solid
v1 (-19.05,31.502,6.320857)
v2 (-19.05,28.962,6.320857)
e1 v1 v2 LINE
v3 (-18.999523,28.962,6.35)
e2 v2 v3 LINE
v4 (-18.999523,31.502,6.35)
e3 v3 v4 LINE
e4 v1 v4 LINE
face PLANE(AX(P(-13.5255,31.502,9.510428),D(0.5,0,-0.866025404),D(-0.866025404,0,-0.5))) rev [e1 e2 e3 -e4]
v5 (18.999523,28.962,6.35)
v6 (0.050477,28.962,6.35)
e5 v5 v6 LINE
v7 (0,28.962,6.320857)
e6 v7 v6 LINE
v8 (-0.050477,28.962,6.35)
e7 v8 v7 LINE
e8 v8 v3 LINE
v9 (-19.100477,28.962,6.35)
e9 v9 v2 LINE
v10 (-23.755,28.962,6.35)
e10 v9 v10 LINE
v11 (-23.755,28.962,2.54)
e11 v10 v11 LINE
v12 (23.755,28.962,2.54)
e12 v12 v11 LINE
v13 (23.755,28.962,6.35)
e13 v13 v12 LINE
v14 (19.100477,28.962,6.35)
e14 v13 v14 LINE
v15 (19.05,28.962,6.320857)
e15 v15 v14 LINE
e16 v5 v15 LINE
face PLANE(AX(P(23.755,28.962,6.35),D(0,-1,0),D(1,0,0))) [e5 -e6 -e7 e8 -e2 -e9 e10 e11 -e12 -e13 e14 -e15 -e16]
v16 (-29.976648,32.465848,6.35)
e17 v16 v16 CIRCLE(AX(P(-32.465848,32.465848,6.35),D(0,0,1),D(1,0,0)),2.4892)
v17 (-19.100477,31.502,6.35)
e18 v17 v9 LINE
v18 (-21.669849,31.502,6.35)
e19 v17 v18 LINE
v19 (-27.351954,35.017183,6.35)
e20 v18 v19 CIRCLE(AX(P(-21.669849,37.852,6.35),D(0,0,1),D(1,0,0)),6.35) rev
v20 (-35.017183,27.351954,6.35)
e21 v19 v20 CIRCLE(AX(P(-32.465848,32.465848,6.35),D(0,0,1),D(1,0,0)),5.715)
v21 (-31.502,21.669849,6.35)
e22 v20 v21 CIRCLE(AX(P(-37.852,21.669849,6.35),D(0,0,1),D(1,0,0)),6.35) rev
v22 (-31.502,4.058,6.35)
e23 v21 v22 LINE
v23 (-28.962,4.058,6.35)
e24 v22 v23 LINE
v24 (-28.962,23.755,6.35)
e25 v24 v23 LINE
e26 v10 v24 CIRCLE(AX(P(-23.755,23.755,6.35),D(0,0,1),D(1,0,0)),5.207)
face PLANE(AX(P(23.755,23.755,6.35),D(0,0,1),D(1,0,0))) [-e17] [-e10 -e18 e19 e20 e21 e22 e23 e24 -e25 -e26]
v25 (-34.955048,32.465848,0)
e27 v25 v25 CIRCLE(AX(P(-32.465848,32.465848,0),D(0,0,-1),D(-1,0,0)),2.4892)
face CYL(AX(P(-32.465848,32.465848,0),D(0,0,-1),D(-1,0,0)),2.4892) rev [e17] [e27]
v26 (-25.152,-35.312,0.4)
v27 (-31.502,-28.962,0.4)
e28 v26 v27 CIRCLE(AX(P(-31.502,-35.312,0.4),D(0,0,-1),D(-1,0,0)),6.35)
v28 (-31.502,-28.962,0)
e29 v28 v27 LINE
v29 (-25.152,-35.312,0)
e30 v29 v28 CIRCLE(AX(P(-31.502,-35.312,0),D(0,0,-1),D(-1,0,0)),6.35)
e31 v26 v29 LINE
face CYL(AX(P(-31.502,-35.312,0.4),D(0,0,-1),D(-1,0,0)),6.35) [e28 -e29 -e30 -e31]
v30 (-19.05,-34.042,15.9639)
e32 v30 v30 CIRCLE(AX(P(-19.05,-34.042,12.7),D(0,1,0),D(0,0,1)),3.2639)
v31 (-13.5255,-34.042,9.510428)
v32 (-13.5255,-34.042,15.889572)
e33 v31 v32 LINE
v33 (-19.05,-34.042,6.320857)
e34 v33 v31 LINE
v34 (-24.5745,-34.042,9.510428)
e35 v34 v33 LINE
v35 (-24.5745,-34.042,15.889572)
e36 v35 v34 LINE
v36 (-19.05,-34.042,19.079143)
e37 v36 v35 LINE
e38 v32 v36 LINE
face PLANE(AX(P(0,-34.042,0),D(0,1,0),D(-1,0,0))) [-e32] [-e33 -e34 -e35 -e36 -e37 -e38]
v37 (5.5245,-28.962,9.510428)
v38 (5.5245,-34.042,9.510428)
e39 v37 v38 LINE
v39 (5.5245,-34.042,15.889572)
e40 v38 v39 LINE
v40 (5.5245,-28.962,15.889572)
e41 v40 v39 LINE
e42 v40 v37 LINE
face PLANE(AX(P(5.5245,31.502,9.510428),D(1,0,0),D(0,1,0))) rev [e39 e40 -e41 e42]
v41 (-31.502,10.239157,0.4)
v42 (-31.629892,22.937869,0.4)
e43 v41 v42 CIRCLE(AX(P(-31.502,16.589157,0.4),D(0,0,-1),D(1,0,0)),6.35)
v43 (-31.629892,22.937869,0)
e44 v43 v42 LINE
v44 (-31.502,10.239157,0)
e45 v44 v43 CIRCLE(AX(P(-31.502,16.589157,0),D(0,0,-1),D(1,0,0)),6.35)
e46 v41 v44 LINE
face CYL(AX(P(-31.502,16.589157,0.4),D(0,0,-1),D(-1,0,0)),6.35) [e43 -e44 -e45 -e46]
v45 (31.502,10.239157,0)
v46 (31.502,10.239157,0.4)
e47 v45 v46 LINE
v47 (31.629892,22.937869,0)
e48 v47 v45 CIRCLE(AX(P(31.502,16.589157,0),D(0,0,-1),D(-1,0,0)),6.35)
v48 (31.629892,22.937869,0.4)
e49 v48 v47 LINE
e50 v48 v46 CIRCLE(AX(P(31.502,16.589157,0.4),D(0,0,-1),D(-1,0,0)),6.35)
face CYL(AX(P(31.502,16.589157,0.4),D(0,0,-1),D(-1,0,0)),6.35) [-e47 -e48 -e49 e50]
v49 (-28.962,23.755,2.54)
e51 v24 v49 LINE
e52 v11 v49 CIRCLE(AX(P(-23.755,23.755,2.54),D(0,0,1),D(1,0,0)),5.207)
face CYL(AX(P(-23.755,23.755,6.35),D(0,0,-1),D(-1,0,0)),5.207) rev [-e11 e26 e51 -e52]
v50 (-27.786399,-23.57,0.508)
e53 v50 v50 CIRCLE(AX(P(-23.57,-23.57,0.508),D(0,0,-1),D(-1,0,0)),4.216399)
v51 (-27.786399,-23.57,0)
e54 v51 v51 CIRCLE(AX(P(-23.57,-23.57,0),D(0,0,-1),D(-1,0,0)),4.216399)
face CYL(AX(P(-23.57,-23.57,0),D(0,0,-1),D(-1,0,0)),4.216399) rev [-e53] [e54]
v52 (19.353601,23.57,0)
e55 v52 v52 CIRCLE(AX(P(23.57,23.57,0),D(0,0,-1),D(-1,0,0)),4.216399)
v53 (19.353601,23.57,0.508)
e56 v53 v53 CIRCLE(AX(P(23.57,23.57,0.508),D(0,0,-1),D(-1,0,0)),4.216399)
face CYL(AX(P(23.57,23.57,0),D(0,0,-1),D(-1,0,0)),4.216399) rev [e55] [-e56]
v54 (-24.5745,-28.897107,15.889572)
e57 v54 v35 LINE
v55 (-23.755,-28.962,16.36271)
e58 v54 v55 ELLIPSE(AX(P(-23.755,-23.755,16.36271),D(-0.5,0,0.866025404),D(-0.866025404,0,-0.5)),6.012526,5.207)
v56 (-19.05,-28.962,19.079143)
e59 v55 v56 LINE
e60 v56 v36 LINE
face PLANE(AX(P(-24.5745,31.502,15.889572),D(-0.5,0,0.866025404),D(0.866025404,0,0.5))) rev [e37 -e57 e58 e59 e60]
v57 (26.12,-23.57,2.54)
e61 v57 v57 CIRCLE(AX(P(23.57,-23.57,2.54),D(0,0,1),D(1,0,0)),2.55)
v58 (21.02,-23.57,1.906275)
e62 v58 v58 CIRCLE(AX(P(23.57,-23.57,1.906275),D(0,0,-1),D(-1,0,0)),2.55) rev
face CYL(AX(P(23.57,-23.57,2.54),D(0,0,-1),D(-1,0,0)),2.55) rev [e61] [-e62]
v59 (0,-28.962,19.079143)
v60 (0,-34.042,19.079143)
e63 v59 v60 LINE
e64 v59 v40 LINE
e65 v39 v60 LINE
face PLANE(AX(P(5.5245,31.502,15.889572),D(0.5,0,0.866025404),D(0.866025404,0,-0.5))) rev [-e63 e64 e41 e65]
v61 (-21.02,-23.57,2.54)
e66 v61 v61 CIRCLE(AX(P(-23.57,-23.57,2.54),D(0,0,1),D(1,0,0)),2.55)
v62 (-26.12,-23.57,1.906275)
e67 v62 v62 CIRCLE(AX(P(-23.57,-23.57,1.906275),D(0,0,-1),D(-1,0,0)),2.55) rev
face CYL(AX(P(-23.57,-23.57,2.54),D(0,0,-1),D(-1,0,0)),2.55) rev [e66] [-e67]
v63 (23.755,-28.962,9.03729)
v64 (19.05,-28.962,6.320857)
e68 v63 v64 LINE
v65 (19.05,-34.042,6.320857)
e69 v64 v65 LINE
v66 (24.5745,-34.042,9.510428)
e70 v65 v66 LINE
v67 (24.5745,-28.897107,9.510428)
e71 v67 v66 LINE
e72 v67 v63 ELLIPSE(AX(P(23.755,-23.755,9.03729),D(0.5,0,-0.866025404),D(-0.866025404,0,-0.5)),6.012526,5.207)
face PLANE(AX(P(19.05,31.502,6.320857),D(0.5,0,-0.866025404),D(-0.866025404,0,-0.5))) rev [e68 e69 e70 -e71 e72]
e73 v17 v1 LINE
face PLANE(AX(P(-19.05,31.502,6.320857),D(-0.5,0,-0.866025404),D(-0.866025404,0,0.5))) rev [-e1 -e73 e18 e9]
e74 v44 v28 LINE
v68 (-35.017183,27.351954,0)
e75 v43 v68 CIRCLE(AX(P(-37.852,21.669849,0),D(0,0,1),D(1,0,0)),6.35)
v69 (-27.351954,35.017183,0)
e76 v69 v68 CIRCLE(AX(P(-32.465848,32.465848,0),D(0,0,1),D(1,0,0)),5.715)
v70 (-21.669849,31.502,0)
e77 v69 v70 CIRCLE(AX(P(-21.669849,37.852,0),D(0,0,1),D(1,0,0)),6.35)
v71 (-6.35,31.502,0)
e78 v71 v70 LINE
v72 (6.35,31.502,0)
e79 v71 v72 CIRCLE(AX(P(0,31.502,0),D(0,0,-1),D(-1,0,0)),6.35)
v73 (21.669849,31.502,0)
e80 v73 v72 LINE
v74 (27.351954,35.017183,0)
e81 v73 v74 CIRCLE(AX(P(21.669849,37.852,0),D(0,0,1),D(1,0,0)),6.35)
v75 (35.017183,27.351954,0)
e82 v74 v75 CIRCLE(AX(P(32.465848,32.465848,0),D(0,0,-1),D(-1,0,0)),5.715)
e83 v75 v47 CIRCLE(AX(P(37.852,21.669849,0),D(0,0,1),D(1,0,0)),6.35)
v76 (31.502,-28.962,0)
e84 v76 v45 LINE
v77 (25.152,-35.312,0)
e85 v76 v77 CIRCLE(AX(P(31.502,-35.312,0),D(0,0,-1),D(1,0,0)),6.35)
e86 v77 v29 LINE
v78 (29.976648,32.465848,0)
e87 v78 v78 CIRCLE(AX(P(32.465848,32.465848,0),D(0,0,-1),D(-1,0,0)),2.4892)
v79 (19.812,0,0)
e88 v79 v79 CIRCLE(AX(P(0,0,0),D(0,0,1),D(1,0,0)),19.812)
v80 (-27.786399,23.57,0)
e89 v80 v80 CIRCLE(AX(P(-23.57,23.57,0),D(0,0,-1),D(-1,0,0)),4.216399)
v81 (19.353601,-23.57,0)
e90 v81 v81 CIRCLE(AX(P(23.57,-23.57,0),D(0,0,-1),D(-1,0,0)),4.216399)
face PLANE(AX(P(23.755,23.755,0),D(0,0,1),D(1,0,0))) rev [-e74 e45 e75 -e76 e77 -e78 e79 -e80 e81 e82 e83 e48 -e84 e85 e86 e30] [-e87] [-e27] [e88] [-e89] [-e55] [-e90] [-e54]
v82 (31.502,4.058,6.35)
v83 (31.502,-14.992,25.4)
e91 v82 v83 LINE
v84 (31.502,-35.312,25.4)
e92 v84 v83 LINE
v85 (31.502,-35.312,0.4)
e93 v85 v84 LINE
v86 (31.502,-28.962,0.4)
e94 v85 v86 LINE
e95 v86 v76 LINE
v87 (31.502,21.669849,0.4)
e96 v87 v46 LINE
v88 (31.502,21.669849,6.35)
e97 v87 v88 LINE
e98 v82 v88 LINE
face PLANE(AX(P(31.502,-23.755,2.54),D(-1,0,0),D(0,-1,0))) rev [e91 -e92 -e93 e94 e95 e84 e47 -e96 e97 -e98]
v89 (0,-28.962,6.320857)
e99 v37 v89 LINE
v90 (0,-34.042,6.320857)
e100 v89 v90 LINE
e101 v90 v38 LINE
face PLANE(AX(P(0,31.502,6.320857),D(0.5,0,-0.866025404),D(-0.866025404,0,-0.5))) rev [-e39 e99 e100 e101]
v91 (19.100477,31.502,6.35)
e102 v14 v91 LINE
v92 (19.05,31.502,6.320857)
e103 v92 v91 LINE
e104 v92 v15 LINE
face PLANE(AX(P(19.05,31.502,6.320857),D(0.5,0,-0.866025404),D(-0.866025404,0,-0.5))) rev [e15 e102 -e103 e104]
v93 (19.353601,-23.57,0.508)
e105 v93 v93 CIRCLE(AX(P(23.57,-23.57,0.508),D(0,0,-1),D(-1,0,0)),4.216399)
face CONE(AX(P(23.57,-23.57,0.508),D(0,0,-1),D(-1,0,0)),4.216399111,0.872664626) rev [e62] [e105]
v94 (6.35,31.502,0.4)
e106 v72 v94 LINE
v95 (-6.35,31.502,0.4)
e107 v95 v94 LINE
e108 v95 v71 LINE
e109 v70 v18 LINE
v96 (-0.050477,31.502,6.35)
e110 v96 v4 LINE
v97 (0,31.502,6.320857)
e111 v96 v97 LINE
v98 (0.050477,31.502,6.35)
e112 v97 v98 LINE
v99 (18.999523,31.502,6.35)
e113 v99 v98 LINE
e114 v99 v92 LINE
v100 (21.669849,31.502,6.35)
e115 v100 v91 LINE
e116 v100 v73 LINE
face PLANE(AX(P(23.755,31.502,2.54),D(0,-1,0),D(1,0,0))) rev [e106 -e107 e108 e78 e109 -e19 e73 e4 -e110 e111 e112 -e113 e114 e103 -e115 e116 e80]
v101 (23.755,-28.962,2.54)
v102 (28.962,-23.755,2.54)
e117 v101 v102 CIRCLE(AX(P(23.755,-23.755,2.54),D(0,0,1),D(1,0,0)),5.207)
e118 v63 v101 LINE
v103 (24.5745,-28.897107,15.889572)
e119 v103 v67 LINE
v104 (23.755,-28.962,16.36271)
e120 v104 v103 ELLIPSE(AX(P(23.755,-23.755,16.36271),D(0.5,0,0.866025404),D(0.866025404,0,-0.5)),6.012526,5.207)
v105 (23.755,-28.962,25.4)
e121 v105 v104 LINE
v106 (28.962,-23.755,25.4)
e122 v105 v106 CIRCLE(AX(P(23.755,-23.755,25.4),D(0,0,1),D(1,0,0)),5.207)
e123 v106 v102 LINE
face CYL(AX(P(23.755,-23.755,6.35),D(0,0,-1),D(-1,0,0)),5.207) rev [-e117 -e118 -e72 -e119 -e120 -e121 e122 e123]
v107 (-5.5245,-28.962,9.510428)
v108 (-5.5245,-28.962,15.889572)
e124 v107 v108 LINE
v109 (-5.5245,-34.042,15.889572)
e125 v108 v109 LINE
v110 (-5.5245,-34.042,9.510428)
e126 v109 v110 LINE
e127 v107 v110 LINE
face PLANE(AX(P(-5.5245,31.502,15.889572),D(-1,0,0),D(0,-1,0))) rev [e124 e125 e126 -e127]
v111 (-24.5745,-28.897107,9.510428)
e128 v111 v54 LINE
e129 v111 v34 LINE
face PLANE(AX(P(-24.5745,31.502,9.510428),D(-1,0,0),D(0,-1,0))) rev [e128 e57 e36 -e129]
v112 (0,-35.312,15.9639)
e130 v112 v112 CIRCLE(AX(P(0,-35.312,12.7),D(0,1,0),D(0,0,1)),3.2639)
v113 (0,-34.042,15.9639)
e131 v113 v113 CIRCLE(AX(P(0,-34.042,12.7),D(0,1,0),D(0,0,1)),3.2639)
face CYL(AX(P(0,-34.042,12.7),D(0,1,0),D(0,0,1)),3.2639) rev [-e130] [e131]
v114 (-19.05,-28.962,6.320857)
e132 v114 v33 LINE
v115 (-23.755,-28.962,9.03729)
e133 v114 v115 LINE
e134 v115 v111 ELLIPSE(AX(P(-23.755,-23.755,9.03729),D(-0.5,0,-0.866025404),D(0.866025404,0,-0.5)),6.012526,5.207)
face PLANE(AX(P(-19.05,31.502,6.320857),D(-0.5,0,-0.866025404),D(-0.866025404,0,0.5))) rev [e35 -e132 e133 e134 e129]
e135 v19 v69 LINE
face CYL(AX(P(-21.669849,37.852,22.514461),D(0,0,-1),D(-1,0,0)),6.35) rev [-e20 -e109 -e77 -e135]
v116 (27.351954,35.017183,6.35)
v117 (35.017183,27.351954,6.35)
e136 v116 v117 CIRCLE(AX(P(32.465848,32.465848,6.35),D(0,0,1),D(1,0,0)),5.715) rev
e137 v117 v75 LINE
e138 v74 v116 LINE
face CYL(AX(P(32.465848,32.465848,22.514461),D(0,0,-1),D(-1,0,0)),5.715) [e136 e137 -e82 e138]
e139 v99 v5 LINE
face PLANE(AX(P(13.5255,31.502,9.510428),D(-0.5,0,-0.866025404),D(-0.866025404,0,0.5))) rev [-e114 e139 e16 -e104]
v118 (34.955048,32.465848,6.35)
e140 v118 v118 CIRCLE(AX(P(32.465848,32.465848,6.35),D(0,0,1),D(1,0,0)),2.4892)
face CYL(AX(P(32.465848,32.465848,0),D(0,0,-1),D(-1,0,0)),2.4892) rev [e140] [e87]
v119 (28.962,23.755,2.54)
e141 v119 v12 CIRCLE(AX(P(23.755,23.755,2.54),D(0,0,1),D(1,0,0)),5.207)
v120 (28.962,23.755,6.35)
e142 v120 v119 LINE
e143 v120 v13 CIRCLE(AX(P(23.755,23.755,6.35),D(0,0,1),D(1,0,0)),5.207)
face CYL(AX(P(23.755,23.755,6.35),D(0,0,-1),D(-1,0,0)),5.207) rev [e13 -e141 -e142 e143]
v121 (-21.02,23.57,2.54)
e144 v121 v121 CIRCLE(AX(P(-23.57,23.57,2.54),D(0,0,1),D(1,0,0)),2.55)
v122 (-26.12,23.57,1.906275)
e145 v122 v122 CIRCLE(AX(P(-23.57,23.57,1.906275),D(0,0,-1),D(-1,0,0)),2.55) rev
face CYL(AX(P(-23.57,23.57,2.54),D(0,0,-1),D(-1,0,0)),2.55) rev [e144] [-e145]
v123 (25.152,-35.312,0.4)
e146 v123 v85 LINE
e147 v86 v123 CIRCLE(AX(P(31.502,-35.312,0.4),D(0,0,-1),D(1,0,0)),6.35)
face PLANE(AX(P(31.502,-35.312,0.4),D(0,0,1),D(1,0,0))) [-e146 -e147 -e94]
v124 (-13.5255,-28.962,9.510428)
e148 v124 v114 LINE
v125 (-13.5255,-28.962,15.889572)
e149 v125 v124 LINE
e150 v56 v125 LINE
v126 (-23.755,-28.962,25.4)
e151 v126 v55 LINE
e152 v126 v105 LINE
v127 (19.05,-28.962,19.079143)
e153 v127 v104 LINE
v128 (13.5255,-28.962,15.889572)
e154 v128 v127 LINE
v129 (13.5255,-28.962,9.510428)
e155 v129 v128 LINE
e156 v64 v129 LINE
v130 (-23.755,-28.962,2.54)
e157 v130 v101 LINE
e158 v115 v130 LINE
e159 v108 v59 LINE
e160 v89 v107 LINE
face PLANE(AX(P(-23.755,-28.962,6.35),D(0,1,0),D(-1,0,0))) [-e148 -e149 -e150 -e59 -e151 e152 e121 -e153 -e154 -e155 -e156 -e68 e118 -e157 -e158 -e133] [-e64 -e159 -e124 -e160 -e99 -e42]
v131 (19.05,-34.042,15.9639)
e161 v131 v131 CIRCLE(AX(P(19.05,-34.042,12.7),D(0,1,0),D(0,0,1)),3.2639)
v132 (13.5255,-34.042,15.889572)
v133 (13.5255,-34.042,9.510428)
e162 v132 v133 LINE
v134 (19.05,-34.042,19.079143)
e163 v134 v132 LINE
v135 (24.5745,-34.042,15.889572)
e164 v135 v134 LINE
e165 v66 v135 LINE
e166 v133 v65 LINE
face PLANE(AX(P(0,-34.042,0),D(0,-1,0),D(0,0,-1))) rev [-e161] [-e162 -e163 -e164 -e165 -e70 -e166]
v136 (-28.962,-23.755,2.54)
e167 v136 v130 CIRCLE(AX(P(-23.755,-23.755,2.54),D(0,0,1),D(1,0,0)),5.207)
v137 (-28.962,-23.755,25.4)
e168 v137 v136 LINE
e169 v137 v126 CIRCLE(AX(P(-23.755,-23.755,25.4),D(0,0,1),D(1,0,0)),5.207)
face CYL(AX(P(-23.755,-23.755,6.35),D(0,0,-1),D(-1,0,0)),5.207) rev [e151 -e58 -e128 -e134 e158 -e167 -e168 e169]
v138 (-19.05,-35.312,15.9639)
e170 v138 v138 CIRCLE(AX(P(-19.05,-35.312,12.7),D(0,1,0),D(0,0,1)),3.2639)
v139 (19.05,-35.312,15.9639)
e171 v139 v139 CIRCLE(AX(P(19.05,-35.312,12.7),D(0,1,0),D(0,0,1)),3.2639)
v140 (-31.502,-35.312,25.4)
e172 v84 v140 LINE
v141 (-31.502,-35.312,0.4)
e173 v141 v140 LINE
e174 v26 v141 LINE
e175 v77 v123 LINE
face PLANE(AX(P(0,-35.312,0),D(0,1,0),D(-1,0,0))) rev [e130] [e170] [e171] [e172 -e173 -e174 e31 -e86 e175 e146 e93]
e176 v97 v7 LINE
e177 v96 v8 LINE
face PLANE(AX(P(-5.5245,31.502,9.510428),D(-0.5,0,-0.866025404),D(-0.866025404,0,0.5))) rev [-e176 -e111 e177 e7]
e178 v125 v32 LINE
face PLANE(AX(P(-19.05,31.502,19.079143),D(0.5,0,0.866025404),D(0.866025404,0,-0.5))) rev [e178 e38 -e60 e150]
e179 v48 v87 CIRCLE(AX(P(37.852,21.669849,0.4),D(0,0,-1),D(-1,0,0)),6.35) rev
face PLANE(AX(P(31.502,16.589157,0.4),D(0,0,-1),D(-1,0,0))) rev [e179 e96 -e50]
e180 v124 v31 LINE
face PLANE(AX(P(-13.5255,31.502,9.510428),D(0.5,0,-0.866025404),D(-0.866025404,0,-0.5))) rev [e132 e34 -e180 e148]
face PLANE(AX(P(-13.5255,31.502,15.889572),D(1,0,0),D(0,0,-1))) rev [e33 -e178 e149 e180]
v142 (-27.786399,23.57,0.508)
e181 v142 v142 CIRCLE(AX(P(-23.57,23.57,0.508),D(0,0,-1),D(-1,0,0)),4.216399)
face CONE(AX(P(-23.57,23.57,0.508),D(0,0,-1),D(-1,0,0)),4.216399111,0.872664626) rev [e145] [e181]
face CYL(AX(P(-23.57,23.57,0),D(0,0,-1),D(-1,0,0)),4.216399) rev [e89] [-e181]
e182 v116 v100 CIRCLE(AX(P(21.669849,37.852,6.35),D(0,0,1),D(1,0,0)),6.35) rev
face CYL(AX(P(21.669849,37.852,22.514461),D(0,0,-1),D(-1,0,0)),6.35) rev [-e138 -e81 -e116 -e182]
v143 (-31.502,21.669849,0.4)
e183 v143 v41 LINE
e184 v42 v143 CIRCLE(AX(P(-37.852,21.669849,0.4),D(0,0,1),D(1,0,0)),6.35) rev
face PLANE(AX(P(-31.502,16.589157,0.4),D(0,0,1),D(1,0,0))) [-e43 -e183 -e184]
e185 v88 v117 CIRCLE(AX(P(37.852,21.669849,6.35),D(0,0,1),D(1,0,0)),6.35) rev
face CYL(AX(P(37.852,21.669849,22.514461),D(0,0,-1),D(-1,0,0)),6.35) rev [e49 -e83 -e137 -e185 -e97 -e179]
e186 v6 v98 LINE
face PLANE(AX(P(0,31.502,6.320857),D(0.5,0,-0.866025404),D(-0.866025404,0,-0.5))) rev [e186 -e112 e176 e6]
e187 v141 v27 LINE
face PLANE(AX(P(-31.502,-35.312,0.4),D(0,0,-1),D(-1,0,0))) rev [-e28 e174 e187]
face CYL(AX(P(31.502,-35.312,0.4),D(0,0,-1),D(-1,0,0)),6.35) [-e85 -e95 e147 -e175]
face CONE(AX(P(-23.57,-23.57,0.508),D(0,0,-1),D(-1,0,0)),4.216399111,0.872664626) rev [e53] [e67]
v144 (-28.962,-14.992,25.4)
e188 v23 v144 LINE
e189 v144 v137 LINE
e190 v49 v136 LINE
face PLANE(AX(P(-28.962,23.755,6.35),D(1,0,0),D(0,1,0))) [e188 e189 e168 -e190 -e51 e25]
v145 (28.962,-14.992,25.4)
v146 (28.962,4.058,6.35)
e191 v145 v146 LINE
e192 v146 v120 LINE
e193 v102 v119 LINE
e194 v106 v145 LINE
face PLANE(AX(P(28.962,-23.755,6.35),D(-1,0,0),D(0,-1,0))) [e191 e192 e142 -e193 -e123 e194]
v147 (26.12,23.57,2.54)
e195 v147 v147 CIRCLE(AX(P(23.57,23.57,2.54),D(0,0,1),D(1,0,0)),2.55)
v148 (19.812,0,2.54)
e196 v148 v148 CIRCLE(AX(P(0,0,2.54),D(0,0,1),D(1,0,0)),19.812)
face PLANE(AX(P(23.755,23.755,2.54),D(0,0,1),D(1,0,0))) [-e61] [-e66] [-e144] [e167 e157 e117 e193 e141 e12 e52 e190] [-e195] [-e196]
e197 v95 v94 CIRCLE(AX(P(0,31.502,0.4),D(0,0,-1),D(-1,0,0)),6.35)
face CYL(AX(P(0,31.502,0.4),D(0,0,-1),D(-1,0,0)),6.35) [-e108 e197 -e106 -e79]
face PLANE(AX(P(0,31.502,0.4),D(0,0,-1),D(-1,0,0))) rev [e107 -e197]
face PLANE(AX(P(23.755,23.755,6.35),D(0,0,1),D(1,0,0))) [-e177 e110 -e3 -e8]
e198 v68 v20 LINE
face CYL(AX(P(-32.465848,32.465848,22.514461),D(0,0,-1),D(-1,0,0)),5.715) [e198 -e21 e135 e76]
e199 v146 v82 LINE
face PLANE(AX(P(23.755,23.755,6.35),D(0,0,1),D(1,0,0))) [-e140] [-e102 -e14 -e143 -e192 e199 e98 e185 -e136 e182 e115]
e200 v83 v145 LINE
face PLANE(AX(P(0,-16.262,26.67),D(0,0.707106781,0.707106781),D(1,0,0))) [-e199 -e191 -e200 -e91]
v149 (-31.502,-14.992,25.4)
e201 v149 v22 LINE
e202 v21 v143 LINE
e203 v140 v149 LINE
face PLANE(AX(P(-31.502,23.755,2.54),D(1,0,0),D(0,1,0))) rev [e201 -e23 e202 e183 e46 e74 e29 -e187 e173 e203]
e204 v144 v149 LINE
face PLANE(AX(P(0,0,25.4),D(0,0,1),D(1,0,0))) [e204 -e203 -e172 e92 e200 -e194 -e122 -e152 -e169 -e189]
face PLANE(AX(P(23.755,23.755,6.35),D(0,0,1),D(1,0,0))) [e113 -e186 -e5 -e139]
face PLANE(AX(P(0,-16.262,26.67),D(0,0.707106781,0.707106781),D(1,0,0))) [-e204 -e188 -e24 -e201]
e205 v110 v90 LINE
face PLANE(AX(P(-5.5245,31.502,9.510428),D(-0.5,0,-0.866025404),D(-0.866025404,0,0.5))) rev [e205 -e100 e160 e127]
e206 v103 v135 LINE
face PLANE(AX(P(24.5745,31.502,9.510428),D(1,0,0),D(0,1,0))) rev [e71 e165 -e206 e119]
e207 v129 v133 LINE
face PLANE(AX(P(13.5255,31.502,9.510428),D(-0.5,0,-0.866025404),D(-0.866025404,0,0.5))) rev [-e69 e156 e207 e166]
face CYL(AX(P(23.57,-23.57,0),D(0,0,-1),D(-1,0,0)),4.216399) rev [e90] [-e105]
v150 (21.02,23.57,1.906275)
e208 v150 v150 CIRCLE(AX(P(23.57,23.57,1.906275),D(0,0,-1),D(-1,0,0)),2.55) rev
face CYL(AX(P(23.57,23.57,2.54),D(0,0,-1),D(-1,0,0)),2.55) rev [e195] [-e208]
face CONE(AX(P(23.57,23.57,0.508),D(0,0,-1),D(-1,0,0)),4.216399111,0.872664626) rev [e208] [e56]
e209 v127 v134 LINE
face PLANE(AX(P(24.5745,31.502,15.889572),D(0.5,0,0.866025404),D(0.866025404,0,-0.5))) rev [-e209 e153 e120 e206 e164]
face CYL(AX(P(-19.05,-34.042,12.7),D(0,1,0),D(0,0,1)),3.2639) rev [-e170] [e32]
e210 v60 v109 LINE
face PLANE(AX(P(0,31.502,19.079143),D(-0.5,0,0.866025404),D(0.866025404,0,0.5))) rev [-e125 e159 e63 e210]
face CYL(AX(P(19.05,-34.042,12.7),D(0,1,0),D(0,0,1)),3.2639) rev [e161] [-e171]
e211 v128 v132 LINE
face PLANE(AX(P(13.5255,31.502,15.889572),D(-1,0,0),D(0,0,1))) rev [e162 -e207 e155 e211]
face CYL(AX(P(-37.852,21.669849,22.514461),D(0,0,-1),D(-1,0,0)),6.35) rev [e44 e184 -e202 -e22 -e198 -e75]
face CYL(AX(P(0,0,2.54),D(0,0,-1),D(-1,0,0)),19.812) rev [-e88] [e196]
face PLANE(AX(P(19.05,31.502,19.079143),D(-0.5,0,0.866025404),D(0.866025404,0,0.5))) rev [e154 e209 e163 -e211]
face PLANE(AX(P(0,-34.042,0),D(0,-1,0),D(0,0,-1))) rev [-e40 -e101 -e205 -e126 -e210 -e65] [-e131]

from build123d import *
from build123d.topology import SkipClean

# Parameters (mm, degrees)
SKETCH3_R                                     = 19.812
SKETCH3_R_2                                   = 2.55
BOSS_EXTRUDE1_DEPTH                           = 2.54
BOSS_EXTRUDE6_DEPTH                           = 3.81
BOSS_EXTRUDE10_DEPTH                          = 22.86
BOSS_EXTRUDE10_DEPTH_BACK                     = 2.54
CHAMFER1_SIZE                                 = 20.32
CUT_EXTRUDE2_DEPTH                            = 5.08
CUT_EXTRUDE2_DEPTH_BACK                       = 73.755970889
F_1_4_CLEARANCE_HOLE1_D                       = 6.5278
SKETCH22_R                                    = 2.413
BOSS_EXTRUDE18_DEPTH                          = 6.35
FILLET1_R                                     = 6.35
CSK_FOR_FLAT_HEAD_MACHINE_SCREW_100_1_A_COUNT = 2
CSK_FOR_FLAT_HEAD_MACHINE_SCREW_100_1_A_PITCH = 47.14
CSK_FOR_FLAT_HEAD_MACHINE_SCREW_100_2_COUNT   = 2
CSK_FOR_FLAT_HEAD_MACHINE_SCREW_100_2_PITCH   = 66.66602733
CSK_FOR_FLAT_HEAD_MACHINE_SCREW_100_3_COUNT   = 2
CSK_FOR_FLAT_HEAD_MACHINE_SCREW_100_3_PITCH   = 47.14
F_10_CLEARANCE_HOLE1_D                        = 4.9784
SKETCH6_R                                     = 6.35
TABS_DEPTH                                    = 0.4


with BuildPart() as part:
    # Sketch3 → Boss-Extrude1 (new body)
    with BuildSketch(Plane.XY):
        with BuildLine():
            Line((23.755, 31.502), (-23.755, 31.502))
            ThreePointArc((-23.755, 31.502), (-29.232956234, 29.232956234), (-31.502, 23.755))
            Line((-31.502, 23.755), (-31.502, -23.755))
            ThreePointArc((-31.502, -23.755), (-29.232956234, -29.232956234), (-23.755, -31.502))
            Line((-23.755, -31.502), (23.755, -31.502))
            ThreePointArc((23.755, -31.502), (29.232956234, -29.232956234), (31.502, -23.755))
            Line((31.502, -23.755), (31.502, 23.755))
            ThreePointArc((31.502, 23.755), (29.232956234, 29.232956234), (23.755, 31.502))
        make_face()
        Circle(SKETCH3_R, mode=Mode.SUBTRACT)
        with Locations((23.57, 23.57)):
            Circle(SKETCH3_R_2, mode=Mode.SUBTRACT)
        with Locations((-23.57, 23.57)):
            Circle(SKETCH3_R_2, mode=Mode.SUBTRACT)
        with Locations((-23.57, -23.57)):
            Circle(SKETCH3_R_2, mode=Mode.SUBTRACT)
        with Locations((23.57, -23.57)):
            Circle(SKETCH3_R_2, mode=Mode.SUBTRACT)
    extrude(amount=BOSS_EXTRUDE1_DEPTH)

    # Sketch16 → Boss-Extrude6 (add)
    with BuildSketch(Plane.XY.offset(2.54)):
        with BuildLine():
            Line((23.755, 31.502), (-23.755, 31.502))
            ThreePointArc((-23.755, 31.502), (-29.232956234, 29.232956234), (-31.502, 23.755))
            Line((-31.502, 23.755), (-31.502, -23.755))
            ThreePointArc((-31.502, -23.755), (-29.232956234, -29.232956234), (-23.755, -31.502))
            Line((-23.755, -31.502), (23.755, -31.502))
            ThreePointArc((23.755, -31.502), (29.232956234, -29.232956234), (31.502, -23.755))
            Line((31.502, -23.755), (31.502, 23.755))
            ThreePointArc((31.502, 23.755), (29.232956234, 29.232956234), (23.755, 31.502))
        make_face()
        with BuildLine():
            Line((23.755, 28.962), (-23.755, 28.962))
            ThreePointArc((-23.755, 28.962), (-27.43690501, 27.43690501), (-28.962, 23.755))
            Line((-28.962, 23.755), (-28.962, -23.755))
            ThreePointArc((-28.962, -23.755), (-27.43690501, -27.43690501), (-23.755, -28.962))
            Line((-23.755, -28.962), (23.755, -28.962))
            ThreePointArc((23.755, -28.962), (27.43690501, -27.43690501), (28.962, -23.755))
            Line((28.962, -23.755), (28.962, 23.755))
            ThreePointArc((28.962, 23.755), (27.43690501, 27.43690501), (23.755, 28.962))
        make_face(mode=Mode.SUBTRACT)
    extrude(amount=BOSS_EXTRUDE6_DEPTH)

    # Sketch17 → Boss-Extrude10 (add, two sides: drawn at the far end of the back side and taken through both)
    with SkipClean():  # the faces are left unmerged after this step: merging them gives an invalid solid
        with BuildSketch(Plane.XY.offset(2.54).offset(-BOSS_EXTRUDE10_DEPTH_BACK)):
            with BuildLine():
                Line((-31.502, -35.312), (31.502, -35.312))
                Line((31.502, -35.312), (31.502, -16.262))
                Line((31.502, -16.262), (28.962, -16.262))
                Line((28.962, -16.262), (28.962, -23.755))
                ThreePointArc((28.962, -23.755), (27.43690501, -27.43690501), (23.755, -28.962))
                Line((23.755, -28.962), (-23.755, -28.962))
                ThreePointArc((-23.755, -28.962), (-27.43690501, -27.43690501), (-28.962, -23.755))
                Line((-28.962, -23.755), (-28.962, -16.262))
                Line((-28.962, -16.262), (-31.502, -16.262))
                Line((-31.502, -16.262), (-31.502, -35.312))
            make_face()
        extrude(amount=BOSS_EXTRUDE10_DEPTH + BOSS_EXTRUDE10_DEPTH_BACK)
    add(part.part.scale(1), mode=Mode.REPLACE)  # the faces are merged on a copy

    # Chamfer1
    # the kernel refuses this chamfer: 20.32 mm, written as the material it adds along each edge
    with BuildSketch(Plane(origin=(28.962, -16.262, 6.35), x_dir=(0, -0.02749587661058643, 0.9996219169112968), z_dir=(1, 0, 0))) as chamfer1_piece_1_section:
        Polygon((CHAMFER1_SIZE * 0.999621916911, -CHAMFER1_SIZE * 0.0274958766106), (-CHAMFER1_SIZE * 0.0274958766106, -CHAMFER1_SIZE * 0.999621916911), (0, 0), align=None)
    chamfer1_piece_1 = extrude(amount=2.54, mode=Mode.PRIVATE)
    chamfer1_piece_1 = split(chamfer1_piece_1, bisect_by=Plane(origin=(30.232, -9.48984053, 25.4), z_dir=(0, 0, -1)), keep=Keep.TOP, mode=Mode.PRIVATE)
    add(chamfer1_piece_1)
    with BuildSketch(Plane(origin=(-31.502, -16.262, 6.35), x_dir=(0, -0.02749587661058643, 0.9996219169112968), z_dir=(1, 0, 0))) as chamfer1_piece_2_section:
        Polygon((CHAMFER1_SIZE * 0.999621916911, -CHAMFER1_SIZE * 0.0274958766106), (-CHAMFER1_SIZE * 0.0274958766106, -CHAMFER1_SIZE * 0.999621916911), (0, 0), align=None)
    chamfer1_piece_2 = extrude(amount=2.54, mode=Mode.PRIVATE)
    chamfer1_piece_2 = split(chamfer1_piece_2, bisect_by=Plane(origin=(-30.232, -9.48984053, 25.4), z_dir=(0, 0, -1)), keep=Keep.TOP, mode=Mode.PRIVATE)
    add(chamfer1_piece_2)

    # Sketch18 → Cut-Extrude2 (cut, two sides: drawn at the far end of the back side and taken through both)
    with BuildSketch(Plane.XZ.offset(28.962).offset(-CUT_EXTRUDE2_DEPTH_BACK)):
        Polygon((0, 19.079143124), (-5.5245, 15.889571562), (-5.5245, 9.510428438), (0, 6.320856876), (5.5245, 9.510428438), (5.5245, 15.889571562), align=None)
        Polygon((-24.5745, 15.889571562), (-19.05, 19.079143124), (-13.5255, 15.889571562), (-13.5255, 9.510428438), (-19.05, 6.320856876), (-24.5745, 9.510428438), align=None)
        Polygon((19.05, 19.079143124), (13.5255, 15.889571562), (13.5255, 9.510428438), (19.05, 6.320856876), (24.5745, 9.510428438), (24.5745, 15.889571562), align=None)
    extrude(amount=CUT_EXTRUDE2_DEPTH + CUT_EXTRUDE2_DEPTH_BACK, mode=Mode.SUBTRACT)

    # 1/4 Clearance Hole1 (through all)
    with Locations(Plane(origin=(0, -34.042, 0), x_dir=(1, 0, 0), z_dir=(0, 1, 0))):
        with Locations((-19.05, -12.7), (0, -12.7), (19.05, -12.7)):
            Hole(F_1_4_CLEARANCE_HOLE1_D / 2)

    # Sketch22 → Boss-Extrude18 (add)
    with BuildSketch(Plane(origin=(0, 0, 0), x_dir=(-1, 0, 0), z_dir=(0, 0, -1))):
        with BuildLine():
            ThreePointArc((-27.002557269, 30.78844729), (-26.814125955, 31.617757649), (-26.750848437, 32.465848437))
            ThreePointArc((-26.750848437, 32.465848437), (-37.061910478, 35.862528982), (-30.78844729, 27.002557269))
            ThreePointArc((-30.78844729, 27.002557269), (-29.232956234, 29.232956234), (-27.002557269, 30.78844729))
        make_face()
        with Locations((-32.465848437, 32.465848437)):
            Circle(SKETCH22_R, mode=Mode.SUBTRACT)
    boss_extrude18 = extrude(amount=-BOSS_EXTRUDE18_DEPTH)

    # Mirror3: Boss-Extrude18 across plane
    add(boss_extrude18.mirror(Plane(origin=(0, 0, 0), x_dir=(0, 0, 1), z_dir=(1, 0, 0))))

    # Fillet1
    fillet1_edges = [part.edges().sort_by_distance(p)[0] for p in [
        (27.002557269, 30.78844729, 3.175),
        (30.78844729, 27.002557269, 3.175),
        (-27.002557269, 30.78844729, 3.175),
        (-30.78844729, 27.002557269, 3.175),
    ]]
    fillet(fillet1_edges, radius=FILLET1_R)

    # Sketch23 → CSK for  Flat Head Machine Screw (100)1 (revolve, cut)
    with BuildSketch(Plane(origin=(23.57, 23.57, 0), x_dir=(0, 1, 0), z_dir=(1, 0, 0))):
        Polygon((0, 0), (0, 25.4), (2.4892, 25.4), (2.4892, 1.957292137), (4.216399111, 0.508), (4.216399111, 0), align=None)
    csk_for_flat_head_machine_screw_100_1 = revolve(axis=Axis((23.57, 23.57, -6.35), (0, 0, 1)), mode=Mode.SUBTRACT)

    # CSK for  Flat Head Machine Screw (100)1 a: CSK for  Flat Head Machine Screw (100)1 ×2
    with Locations(*[(-i * CSK_FOR_FLAT_HEAD_MACHINE_SCREW_100_1_A_PITCH, 0, 0) for i in range(1, CSK_FOR_FLAT_HEAD_MACHINE_SCREW_100_1_A_COUNT)]):
        add(csk_for_flat_head_machine_screw_100_1, mode=Mode.SUBTRACT)

    # CSK for Flat Head Machine Screw _100 2: CSK for  Flat Head Machine Screw (100)1 ×2
    with Locations(*[Vector(-0.7071067811865476, -0.7071067811865476, 0) * (i * CSK_FOR_FLAT_HEAD_MACHINE_SCREW_100_2_PITCH) for i in range(1, CSK_FOR_FLAT_HEAD_MACHINE_SCREW_100_2_COUNT)]):
        add(csk_for_flat_head_machine_screw_100_1, mode=Mode.SUBTRACT)

    # CSK for Flat Head Machine Screw _100 3: CSK for  Flat Head Machine Screw (100)1 ×2
    with Locations(*[(0, -i * CSK_FOR_FLAT_HEAD_MACHINE_SCREW_100_3_PITCH, 0) for i in range(1, CSK_FOR_FLAT_HEAD_MACHINE_SCREW_100_3_COUNT)]):
        add(csk_for_flat_head_machine_screw_100_1, mode=Mode.SUBTRACT)

    # #10 Clearance Hole1 (through all)
    with Locations(Plane(origin=(0, 0, 0), x_dir=(-1, 0, 0), z_dir=(0, 0, -1))):
        with Locations((-32.465848437, 32.465848437), (32.465848437, 32.465848437)):
            Hole(F_10_CLEARANCE_HOLE1_D / 2)

    # Sketch6 → Tabs (add)
    with BuildSketch(Plane(origin=(0, -30.232, 0), x_dir=(-1, 0, 0), z_dir=(0, 0, -1))):
        with Locations((31.502, -5.08)):
            Circle(SKETCH6_R)
        with Locations((-31.502, -5.08)):
            Circle(SKETCH6_R)
        with Locations((-31.502, 46.821157202)):
            Circle(SKETCH6_R)
        with Locations((31.502, 46.821157202)):
            Circle(SKETCH6_R)
        with Locations((0, 61.734)):
            Circle(SKETCH6_R)
    extrude(amount=-TABS_DEPTH)


solid = part.part
